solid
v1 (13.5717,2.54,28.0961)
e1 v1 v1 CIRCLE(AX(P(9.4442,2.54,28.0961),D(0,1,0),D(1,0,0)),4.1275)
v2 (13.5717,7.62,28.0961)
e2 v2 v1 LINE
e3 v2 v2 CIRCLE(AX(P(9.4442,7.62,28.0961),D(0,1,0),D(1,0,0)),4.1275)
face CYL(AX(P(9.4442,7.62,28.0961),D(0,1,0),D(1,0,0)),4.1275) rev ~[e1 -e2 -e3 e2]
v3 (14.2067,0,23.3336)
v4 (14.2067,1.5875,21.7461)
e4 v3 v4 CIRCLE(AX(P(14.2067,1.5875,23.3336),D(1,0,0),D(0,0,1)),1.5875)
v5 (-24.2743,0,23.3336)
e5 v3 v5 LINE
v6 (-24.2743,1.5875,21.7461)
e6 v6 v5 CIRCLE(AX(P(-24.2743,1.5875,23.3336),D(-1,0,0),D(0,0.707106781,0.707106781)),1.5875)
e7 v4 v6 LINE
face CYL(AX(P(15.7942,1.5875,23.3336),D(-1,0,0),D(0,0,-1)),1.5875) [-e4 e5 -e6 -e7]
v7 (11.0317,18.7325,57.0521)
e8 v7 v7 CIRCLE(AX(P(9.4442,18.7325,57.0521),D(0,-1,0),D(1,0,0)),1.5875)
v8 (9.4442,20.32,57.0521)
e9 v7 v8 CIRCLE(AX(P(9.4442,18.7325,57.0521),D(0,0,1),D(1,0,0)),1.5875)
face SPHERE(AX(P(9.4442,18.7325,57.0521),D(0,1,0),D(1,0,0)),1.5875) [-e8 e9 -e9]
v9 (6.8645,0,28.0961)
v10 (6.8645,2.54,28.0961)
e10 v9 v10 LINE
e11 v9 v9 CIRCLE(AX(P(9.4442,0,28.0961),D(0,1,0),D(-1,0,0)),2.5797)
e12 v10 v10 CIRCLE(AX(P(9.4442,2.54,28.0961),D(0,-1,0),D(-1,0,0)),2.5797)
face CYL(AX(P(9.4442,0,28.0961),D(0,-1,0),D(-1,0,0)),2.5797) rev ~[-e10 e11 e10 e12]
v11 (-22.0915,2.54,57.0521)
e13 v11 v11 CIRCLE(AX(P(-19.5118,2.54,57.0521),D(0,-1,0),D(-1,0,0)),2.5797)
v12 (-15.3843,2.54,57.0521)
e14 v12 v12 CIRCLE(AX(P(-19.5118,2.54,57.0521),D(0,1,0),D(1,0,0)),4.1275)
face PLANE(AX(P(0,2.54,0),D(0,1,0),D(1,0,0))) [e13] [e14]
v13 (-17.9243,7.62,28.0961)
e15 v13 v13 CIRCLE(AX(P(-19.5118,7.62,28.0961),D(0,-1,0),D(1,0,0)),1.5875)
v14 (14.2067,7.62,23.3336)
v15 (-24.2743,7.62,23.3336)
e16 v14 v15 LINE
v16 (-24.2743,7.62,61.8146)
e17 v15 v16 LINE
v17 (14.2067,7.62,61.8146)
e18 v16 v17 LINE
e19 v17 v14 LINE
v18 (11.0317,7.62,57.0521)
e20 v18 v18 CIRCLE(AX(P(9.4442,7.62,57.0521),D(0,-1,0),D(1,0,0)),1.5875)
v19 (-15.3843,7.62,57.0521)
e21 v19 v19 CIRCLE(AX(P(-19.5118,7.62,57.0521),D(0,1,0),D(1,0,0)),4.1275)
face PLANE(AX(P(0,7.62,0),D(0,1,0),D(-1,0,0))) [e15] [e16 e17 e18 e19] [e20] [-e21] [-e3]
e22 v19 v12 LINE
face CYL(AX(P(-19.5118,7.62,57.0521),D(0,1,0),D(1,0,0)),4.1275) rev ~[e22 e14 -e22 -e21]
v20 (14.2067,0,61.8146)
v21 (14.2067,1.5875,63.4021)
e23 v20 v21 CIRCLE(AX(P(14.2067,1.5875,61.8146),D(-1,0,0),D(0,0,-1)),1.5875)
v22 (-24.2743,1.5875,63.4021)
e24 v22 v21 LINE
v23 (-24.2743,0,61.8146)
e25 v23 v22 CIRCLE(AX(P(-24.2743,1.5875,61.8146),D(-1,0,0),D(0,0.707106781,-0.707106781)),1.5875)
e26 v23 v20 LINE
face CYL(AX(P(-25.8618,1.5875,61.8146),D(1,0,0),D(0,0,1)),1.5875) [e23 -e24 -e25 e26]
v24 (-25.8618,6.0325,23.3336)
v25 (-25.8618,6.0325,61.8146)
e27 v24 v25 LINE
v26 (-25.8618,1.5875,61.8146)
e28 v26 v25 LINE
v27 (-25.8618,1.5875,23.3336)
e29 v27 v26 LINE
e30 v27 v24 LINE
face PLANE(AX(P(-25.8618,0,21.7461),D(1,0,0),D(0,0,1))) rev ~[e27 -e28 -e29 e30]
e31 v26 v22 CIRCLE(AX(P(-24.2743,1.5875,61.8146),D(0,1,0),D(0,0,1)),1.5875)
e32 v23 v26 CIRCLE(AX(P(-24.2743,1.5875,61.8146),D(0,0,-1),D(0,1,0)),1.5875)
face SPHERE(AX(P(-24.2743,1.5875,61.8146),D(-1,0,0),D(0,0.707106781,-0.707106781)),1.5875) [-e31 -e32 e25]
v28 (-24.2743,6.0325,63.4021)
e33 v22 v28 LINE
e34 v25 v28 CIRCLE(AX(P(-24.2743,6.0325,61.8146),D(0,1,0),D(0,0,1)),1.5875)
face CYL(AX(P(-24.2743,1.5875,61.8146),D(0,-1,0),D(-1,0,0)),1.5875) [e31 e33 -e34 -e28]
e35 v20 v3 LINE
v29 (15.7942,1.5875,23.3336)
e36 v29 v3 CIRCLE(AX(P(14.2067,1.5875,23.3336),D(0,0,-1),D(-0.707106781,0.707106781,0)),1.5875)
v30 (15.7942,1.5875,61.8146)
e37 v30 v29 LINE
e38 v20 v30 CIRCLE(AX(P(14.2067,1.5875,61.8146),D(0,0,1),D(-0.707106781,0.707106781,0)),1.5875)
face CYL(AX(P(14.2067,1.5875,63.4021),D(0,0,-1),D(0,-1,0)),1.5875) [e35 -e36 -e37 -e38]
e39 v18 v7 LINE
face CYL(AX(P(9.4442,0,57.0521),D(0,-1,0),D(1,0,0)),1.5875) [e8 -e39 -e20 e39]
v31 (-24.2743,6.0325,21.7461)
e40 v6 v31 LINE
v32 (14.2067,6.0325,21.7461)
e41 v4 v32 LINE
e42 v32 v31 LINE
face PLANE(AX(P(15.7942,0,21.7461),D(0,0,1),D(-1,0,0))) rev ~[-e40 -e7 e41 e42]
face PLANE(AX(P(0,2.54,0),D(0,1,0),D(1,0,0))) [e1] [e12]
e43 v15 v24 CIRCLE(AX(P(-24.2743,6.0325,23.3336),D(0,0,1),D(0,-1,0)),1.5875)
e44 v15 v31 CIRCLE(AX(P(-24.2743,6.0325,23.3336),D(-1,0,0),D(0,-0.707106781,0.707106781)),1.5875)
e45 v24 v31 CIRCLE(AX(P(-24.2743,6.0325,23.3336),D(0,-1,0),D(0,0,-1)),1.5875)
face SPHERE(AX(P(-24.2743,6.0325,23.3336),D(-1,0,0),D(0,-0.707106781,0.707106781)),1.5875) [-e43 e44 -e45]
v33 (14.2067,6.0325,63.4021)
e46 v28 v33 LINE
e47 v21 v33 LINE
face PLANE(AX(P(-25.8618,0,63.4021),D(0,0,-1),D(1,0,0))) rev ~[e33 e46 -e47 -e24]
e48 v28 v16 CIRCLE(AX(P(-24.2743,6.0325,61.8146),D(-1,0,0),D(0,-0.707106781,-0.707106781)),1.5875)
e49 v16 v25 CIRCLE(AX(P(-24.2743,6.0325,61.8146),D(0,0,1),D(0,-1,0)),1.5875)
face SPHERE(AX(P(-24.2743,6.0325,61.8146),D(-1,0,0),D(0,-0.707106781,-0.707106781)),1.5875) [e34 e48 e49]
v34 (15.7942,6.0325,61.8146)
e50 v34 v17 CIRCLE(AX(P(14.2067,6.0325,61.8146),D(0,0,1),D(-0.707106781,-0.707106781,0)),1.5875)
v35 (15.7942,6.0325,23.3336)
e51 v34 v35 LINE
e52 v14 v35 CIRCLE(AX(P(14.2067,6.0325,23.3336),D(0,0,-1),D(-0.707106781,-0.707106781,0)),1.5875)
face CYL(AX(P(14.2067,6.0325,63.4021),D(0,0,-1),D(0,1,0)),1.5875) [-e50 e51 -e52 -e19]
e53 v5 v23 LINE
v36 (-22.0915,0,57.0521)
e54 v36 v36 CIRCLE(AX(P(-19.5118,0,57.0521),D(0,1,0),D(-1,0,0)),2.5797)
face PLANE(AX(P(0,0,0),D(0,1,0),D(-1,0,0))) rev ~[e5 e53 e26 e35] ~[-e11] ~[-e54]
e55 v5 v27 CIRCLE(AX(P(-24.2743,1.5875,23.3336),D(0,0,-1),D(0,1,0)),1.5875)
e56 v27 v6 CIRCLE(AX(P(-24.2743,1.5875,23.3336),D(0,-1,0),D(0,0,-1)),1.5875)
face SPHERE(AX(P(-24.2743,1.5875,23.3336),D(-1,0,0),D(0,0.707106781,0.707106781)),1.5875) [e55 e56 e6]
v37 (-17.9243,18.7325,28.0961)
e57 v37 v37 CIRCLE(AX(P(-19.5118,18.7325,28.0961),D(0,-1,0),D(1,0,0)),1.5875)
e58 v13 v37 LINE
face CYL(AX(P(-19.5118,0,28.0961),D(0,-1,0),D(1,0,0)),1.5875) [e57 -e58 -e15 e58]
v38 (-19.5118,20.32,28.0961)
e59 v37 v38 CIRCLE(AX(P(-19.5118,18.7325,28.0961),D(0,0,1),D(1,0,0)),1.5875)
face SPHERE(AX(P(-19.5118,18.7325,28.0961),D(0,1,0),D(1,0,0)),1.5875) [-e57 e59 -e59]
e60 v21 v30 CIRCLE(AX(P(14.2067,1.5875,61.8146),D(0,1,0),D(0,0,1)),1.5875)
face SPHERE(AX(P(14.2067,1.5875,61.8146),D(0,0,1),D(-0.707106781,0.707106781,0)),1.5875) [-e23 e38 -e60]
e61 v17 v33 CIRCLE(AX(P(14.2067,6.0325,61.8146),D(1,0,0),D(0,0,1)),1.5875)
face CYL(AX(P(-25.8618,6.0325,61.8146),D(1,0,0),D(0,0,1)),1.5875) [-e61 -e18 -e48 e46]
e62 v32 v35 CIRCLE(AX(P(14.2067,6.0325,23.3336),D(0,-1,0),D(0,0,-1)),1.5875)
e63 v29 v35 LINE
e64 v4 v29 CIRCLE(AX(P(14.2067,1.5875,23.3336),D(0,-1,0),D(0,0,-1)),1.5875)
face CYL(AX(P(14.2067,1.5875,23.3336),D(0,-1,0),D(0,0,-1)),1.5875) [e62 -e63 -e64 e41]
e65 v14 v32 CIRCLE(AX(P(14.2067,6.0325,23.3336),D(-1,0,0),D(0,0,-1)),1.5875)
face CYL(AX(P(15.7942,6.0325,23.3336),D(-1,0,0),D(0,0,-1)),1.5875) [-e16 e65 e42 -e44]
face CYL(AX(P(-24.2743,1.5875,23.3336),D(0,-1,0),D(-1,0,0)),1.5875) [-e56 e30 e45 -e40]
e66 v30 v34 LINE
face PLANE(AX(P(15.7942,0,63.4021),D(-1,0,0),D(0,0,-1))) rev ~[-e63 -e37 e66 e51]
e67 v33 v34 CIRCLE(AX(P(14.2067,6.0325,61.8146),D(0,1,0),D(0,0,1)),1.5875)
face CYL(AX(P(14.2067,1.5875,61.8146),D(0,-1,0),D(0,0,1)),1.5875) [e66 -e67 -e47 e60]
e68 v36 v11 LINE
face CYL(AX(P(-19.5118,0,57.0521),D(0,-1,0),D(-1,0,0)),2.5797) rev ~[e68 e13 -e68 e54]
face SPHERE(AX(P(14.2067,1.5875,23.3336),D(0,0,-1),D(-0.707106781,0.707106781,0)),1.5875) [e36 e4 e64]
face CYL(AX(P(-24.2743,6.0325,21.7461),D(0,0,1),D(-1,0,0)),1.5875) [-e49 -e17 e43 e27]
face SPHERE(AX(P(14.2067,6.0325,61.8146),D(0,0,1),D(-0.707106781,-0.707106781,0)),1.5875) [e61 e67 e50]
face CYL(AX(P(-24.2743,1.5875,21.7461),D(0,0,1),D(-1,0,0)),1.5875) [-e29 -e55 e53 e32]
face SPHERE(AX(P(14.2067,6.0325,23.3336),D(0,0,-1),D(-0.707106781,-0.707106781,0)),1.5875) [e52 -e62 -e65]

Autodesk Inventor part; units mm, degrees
ref_plane "YZ Plane" through (0, 0, 0) normal (1, 0, 0) x (0, 1, 0)
ref_plane "XZ Plane" through (0, 0, 0) normal (0, 1, 0) x (-1, 0, 0)
ref_plane "XY Plane" through (0, 0, 0) normal (0, 0, 1) x (1, 0, 0)
sketch "Sketch1" plane through (0, 0, 0) normal (0, 1, 0) x (-1, 0, 0)
  circle A0 centre (19.5118, 57.0521) radius 2.5797
  circle A1 centre (19.5118, 28.0961) radius 1.5875
  circle A2 centre (-9.4442, 28.0961) radius 2.5797
  circle A3 centre (-9.4442, 57.0521) radius 1.5875
  line L0 (25.8618, 63.4021) -> (-15.7942, 63.4021)
  line L1 (-15.7942, 63.4021) -> (-15.7942, 21.7461)
  line L2 (-15.7942, 21.7461) -> (25.8618, 21.7461)
  line L3 (25.8618, 21.7461) -> (25.8618, 63.4021)
  point P0 (0, 0)
  dimension "d0" = 5.1594
  dimension "d1" = 3.175
  dimension "d2" = 28.956
  dimension "d3" = 5.1594
  dimension "d4" = 3.175
  dimension "d5" = 28.956
  dimension "d6" = 28.956
  dimension "d7" = 28.956
  dimension "d8" = 41.656
  dimension "d9" = 41.656
  dimension "d10" = 6.35
  dimension "d11" = 6.35
extrude "Extrusion1" add sketch "Sketch1" along normal blind 7.62
sketch "Sketch2" plane through (0, 7.62, 0) normal (0, 1, 0) x (1, 0, 0)
  circle A0 centre (-19.5118, -57.0521) radius 2.5797 projected
  circle A1 centre (-19.5118, -57.0521) radius 4.1275
  circle A2 centre (9.4442, -28.0961) radius 2.5797 projected
  circle A3 centre (9.4442, -28.0961) radius 4.1275
  point P0 (0, 0)
  dimension "d14" = 8.255
  dimension "d15" = 8.255
extrude "Extrusion2" cut sketch "Sketch2" against normal blind 5.08 contours A0 | A1 | A2 | A3
sketch "Sketch3" plane through (0, 0, 0) normal (0, -1, 0) x (1, 0, 0)
  circle A0 centre (-19.5118, 28.0961) radius 1.5875 projected
  circle A1 centre (-19.5118, 28.0961) radius 1.5875
  circle A2 centre (9.4442, 57.0521) radius 1.5875 projected
  circle A3 centre (9.4442, 57.0521) radius 1.5875
  point P0 (0, 0)
extrude "Extrusion3" add sketch "Sketch3" against normal blind 20.32
fillet "Fillet1" radius 1.5875 8 edges at (-25.8618, 7.62, 42.5741) (-5.0338, 7.62, 21.7461) (15.7942, 7.62, 42.5741) (-5.0338, 7.62, 63.4021) (-5.0338, 0, 63.4021) (-25.8618, 0, 42.5741) (-5.0338, 0, 21.7461) (15.7942, 0, 42.5741)
fillet "Fillet2" radius 1.5875 2 edges at (7.8567, 20.32, 57.0521) (-21.0993, 20.32, 28.0961)
fillet "Fillet3" radius 1.5875 12 edges at (15.3292, 7.155, 62.9372) (15.3292, 0.465, 62.9372) (15.7942, 3.81, 63.4021) (15.3292, 7.155, 22.2111) (15.3292, 0.465, 22.2111) (15.7942, 3.81, 21.7461) (-25.3968, 7.155, 22.2111) (-25.3968, 0.465, 22.2111) (-25.8618, 3.81, 21.7461) (-25.3968, 7.155, 62.9372) (-25.3968, 0.465, 62.9372) (-25.8618, 3.81, 63.4021)
properties part number "pigeon Mount"
